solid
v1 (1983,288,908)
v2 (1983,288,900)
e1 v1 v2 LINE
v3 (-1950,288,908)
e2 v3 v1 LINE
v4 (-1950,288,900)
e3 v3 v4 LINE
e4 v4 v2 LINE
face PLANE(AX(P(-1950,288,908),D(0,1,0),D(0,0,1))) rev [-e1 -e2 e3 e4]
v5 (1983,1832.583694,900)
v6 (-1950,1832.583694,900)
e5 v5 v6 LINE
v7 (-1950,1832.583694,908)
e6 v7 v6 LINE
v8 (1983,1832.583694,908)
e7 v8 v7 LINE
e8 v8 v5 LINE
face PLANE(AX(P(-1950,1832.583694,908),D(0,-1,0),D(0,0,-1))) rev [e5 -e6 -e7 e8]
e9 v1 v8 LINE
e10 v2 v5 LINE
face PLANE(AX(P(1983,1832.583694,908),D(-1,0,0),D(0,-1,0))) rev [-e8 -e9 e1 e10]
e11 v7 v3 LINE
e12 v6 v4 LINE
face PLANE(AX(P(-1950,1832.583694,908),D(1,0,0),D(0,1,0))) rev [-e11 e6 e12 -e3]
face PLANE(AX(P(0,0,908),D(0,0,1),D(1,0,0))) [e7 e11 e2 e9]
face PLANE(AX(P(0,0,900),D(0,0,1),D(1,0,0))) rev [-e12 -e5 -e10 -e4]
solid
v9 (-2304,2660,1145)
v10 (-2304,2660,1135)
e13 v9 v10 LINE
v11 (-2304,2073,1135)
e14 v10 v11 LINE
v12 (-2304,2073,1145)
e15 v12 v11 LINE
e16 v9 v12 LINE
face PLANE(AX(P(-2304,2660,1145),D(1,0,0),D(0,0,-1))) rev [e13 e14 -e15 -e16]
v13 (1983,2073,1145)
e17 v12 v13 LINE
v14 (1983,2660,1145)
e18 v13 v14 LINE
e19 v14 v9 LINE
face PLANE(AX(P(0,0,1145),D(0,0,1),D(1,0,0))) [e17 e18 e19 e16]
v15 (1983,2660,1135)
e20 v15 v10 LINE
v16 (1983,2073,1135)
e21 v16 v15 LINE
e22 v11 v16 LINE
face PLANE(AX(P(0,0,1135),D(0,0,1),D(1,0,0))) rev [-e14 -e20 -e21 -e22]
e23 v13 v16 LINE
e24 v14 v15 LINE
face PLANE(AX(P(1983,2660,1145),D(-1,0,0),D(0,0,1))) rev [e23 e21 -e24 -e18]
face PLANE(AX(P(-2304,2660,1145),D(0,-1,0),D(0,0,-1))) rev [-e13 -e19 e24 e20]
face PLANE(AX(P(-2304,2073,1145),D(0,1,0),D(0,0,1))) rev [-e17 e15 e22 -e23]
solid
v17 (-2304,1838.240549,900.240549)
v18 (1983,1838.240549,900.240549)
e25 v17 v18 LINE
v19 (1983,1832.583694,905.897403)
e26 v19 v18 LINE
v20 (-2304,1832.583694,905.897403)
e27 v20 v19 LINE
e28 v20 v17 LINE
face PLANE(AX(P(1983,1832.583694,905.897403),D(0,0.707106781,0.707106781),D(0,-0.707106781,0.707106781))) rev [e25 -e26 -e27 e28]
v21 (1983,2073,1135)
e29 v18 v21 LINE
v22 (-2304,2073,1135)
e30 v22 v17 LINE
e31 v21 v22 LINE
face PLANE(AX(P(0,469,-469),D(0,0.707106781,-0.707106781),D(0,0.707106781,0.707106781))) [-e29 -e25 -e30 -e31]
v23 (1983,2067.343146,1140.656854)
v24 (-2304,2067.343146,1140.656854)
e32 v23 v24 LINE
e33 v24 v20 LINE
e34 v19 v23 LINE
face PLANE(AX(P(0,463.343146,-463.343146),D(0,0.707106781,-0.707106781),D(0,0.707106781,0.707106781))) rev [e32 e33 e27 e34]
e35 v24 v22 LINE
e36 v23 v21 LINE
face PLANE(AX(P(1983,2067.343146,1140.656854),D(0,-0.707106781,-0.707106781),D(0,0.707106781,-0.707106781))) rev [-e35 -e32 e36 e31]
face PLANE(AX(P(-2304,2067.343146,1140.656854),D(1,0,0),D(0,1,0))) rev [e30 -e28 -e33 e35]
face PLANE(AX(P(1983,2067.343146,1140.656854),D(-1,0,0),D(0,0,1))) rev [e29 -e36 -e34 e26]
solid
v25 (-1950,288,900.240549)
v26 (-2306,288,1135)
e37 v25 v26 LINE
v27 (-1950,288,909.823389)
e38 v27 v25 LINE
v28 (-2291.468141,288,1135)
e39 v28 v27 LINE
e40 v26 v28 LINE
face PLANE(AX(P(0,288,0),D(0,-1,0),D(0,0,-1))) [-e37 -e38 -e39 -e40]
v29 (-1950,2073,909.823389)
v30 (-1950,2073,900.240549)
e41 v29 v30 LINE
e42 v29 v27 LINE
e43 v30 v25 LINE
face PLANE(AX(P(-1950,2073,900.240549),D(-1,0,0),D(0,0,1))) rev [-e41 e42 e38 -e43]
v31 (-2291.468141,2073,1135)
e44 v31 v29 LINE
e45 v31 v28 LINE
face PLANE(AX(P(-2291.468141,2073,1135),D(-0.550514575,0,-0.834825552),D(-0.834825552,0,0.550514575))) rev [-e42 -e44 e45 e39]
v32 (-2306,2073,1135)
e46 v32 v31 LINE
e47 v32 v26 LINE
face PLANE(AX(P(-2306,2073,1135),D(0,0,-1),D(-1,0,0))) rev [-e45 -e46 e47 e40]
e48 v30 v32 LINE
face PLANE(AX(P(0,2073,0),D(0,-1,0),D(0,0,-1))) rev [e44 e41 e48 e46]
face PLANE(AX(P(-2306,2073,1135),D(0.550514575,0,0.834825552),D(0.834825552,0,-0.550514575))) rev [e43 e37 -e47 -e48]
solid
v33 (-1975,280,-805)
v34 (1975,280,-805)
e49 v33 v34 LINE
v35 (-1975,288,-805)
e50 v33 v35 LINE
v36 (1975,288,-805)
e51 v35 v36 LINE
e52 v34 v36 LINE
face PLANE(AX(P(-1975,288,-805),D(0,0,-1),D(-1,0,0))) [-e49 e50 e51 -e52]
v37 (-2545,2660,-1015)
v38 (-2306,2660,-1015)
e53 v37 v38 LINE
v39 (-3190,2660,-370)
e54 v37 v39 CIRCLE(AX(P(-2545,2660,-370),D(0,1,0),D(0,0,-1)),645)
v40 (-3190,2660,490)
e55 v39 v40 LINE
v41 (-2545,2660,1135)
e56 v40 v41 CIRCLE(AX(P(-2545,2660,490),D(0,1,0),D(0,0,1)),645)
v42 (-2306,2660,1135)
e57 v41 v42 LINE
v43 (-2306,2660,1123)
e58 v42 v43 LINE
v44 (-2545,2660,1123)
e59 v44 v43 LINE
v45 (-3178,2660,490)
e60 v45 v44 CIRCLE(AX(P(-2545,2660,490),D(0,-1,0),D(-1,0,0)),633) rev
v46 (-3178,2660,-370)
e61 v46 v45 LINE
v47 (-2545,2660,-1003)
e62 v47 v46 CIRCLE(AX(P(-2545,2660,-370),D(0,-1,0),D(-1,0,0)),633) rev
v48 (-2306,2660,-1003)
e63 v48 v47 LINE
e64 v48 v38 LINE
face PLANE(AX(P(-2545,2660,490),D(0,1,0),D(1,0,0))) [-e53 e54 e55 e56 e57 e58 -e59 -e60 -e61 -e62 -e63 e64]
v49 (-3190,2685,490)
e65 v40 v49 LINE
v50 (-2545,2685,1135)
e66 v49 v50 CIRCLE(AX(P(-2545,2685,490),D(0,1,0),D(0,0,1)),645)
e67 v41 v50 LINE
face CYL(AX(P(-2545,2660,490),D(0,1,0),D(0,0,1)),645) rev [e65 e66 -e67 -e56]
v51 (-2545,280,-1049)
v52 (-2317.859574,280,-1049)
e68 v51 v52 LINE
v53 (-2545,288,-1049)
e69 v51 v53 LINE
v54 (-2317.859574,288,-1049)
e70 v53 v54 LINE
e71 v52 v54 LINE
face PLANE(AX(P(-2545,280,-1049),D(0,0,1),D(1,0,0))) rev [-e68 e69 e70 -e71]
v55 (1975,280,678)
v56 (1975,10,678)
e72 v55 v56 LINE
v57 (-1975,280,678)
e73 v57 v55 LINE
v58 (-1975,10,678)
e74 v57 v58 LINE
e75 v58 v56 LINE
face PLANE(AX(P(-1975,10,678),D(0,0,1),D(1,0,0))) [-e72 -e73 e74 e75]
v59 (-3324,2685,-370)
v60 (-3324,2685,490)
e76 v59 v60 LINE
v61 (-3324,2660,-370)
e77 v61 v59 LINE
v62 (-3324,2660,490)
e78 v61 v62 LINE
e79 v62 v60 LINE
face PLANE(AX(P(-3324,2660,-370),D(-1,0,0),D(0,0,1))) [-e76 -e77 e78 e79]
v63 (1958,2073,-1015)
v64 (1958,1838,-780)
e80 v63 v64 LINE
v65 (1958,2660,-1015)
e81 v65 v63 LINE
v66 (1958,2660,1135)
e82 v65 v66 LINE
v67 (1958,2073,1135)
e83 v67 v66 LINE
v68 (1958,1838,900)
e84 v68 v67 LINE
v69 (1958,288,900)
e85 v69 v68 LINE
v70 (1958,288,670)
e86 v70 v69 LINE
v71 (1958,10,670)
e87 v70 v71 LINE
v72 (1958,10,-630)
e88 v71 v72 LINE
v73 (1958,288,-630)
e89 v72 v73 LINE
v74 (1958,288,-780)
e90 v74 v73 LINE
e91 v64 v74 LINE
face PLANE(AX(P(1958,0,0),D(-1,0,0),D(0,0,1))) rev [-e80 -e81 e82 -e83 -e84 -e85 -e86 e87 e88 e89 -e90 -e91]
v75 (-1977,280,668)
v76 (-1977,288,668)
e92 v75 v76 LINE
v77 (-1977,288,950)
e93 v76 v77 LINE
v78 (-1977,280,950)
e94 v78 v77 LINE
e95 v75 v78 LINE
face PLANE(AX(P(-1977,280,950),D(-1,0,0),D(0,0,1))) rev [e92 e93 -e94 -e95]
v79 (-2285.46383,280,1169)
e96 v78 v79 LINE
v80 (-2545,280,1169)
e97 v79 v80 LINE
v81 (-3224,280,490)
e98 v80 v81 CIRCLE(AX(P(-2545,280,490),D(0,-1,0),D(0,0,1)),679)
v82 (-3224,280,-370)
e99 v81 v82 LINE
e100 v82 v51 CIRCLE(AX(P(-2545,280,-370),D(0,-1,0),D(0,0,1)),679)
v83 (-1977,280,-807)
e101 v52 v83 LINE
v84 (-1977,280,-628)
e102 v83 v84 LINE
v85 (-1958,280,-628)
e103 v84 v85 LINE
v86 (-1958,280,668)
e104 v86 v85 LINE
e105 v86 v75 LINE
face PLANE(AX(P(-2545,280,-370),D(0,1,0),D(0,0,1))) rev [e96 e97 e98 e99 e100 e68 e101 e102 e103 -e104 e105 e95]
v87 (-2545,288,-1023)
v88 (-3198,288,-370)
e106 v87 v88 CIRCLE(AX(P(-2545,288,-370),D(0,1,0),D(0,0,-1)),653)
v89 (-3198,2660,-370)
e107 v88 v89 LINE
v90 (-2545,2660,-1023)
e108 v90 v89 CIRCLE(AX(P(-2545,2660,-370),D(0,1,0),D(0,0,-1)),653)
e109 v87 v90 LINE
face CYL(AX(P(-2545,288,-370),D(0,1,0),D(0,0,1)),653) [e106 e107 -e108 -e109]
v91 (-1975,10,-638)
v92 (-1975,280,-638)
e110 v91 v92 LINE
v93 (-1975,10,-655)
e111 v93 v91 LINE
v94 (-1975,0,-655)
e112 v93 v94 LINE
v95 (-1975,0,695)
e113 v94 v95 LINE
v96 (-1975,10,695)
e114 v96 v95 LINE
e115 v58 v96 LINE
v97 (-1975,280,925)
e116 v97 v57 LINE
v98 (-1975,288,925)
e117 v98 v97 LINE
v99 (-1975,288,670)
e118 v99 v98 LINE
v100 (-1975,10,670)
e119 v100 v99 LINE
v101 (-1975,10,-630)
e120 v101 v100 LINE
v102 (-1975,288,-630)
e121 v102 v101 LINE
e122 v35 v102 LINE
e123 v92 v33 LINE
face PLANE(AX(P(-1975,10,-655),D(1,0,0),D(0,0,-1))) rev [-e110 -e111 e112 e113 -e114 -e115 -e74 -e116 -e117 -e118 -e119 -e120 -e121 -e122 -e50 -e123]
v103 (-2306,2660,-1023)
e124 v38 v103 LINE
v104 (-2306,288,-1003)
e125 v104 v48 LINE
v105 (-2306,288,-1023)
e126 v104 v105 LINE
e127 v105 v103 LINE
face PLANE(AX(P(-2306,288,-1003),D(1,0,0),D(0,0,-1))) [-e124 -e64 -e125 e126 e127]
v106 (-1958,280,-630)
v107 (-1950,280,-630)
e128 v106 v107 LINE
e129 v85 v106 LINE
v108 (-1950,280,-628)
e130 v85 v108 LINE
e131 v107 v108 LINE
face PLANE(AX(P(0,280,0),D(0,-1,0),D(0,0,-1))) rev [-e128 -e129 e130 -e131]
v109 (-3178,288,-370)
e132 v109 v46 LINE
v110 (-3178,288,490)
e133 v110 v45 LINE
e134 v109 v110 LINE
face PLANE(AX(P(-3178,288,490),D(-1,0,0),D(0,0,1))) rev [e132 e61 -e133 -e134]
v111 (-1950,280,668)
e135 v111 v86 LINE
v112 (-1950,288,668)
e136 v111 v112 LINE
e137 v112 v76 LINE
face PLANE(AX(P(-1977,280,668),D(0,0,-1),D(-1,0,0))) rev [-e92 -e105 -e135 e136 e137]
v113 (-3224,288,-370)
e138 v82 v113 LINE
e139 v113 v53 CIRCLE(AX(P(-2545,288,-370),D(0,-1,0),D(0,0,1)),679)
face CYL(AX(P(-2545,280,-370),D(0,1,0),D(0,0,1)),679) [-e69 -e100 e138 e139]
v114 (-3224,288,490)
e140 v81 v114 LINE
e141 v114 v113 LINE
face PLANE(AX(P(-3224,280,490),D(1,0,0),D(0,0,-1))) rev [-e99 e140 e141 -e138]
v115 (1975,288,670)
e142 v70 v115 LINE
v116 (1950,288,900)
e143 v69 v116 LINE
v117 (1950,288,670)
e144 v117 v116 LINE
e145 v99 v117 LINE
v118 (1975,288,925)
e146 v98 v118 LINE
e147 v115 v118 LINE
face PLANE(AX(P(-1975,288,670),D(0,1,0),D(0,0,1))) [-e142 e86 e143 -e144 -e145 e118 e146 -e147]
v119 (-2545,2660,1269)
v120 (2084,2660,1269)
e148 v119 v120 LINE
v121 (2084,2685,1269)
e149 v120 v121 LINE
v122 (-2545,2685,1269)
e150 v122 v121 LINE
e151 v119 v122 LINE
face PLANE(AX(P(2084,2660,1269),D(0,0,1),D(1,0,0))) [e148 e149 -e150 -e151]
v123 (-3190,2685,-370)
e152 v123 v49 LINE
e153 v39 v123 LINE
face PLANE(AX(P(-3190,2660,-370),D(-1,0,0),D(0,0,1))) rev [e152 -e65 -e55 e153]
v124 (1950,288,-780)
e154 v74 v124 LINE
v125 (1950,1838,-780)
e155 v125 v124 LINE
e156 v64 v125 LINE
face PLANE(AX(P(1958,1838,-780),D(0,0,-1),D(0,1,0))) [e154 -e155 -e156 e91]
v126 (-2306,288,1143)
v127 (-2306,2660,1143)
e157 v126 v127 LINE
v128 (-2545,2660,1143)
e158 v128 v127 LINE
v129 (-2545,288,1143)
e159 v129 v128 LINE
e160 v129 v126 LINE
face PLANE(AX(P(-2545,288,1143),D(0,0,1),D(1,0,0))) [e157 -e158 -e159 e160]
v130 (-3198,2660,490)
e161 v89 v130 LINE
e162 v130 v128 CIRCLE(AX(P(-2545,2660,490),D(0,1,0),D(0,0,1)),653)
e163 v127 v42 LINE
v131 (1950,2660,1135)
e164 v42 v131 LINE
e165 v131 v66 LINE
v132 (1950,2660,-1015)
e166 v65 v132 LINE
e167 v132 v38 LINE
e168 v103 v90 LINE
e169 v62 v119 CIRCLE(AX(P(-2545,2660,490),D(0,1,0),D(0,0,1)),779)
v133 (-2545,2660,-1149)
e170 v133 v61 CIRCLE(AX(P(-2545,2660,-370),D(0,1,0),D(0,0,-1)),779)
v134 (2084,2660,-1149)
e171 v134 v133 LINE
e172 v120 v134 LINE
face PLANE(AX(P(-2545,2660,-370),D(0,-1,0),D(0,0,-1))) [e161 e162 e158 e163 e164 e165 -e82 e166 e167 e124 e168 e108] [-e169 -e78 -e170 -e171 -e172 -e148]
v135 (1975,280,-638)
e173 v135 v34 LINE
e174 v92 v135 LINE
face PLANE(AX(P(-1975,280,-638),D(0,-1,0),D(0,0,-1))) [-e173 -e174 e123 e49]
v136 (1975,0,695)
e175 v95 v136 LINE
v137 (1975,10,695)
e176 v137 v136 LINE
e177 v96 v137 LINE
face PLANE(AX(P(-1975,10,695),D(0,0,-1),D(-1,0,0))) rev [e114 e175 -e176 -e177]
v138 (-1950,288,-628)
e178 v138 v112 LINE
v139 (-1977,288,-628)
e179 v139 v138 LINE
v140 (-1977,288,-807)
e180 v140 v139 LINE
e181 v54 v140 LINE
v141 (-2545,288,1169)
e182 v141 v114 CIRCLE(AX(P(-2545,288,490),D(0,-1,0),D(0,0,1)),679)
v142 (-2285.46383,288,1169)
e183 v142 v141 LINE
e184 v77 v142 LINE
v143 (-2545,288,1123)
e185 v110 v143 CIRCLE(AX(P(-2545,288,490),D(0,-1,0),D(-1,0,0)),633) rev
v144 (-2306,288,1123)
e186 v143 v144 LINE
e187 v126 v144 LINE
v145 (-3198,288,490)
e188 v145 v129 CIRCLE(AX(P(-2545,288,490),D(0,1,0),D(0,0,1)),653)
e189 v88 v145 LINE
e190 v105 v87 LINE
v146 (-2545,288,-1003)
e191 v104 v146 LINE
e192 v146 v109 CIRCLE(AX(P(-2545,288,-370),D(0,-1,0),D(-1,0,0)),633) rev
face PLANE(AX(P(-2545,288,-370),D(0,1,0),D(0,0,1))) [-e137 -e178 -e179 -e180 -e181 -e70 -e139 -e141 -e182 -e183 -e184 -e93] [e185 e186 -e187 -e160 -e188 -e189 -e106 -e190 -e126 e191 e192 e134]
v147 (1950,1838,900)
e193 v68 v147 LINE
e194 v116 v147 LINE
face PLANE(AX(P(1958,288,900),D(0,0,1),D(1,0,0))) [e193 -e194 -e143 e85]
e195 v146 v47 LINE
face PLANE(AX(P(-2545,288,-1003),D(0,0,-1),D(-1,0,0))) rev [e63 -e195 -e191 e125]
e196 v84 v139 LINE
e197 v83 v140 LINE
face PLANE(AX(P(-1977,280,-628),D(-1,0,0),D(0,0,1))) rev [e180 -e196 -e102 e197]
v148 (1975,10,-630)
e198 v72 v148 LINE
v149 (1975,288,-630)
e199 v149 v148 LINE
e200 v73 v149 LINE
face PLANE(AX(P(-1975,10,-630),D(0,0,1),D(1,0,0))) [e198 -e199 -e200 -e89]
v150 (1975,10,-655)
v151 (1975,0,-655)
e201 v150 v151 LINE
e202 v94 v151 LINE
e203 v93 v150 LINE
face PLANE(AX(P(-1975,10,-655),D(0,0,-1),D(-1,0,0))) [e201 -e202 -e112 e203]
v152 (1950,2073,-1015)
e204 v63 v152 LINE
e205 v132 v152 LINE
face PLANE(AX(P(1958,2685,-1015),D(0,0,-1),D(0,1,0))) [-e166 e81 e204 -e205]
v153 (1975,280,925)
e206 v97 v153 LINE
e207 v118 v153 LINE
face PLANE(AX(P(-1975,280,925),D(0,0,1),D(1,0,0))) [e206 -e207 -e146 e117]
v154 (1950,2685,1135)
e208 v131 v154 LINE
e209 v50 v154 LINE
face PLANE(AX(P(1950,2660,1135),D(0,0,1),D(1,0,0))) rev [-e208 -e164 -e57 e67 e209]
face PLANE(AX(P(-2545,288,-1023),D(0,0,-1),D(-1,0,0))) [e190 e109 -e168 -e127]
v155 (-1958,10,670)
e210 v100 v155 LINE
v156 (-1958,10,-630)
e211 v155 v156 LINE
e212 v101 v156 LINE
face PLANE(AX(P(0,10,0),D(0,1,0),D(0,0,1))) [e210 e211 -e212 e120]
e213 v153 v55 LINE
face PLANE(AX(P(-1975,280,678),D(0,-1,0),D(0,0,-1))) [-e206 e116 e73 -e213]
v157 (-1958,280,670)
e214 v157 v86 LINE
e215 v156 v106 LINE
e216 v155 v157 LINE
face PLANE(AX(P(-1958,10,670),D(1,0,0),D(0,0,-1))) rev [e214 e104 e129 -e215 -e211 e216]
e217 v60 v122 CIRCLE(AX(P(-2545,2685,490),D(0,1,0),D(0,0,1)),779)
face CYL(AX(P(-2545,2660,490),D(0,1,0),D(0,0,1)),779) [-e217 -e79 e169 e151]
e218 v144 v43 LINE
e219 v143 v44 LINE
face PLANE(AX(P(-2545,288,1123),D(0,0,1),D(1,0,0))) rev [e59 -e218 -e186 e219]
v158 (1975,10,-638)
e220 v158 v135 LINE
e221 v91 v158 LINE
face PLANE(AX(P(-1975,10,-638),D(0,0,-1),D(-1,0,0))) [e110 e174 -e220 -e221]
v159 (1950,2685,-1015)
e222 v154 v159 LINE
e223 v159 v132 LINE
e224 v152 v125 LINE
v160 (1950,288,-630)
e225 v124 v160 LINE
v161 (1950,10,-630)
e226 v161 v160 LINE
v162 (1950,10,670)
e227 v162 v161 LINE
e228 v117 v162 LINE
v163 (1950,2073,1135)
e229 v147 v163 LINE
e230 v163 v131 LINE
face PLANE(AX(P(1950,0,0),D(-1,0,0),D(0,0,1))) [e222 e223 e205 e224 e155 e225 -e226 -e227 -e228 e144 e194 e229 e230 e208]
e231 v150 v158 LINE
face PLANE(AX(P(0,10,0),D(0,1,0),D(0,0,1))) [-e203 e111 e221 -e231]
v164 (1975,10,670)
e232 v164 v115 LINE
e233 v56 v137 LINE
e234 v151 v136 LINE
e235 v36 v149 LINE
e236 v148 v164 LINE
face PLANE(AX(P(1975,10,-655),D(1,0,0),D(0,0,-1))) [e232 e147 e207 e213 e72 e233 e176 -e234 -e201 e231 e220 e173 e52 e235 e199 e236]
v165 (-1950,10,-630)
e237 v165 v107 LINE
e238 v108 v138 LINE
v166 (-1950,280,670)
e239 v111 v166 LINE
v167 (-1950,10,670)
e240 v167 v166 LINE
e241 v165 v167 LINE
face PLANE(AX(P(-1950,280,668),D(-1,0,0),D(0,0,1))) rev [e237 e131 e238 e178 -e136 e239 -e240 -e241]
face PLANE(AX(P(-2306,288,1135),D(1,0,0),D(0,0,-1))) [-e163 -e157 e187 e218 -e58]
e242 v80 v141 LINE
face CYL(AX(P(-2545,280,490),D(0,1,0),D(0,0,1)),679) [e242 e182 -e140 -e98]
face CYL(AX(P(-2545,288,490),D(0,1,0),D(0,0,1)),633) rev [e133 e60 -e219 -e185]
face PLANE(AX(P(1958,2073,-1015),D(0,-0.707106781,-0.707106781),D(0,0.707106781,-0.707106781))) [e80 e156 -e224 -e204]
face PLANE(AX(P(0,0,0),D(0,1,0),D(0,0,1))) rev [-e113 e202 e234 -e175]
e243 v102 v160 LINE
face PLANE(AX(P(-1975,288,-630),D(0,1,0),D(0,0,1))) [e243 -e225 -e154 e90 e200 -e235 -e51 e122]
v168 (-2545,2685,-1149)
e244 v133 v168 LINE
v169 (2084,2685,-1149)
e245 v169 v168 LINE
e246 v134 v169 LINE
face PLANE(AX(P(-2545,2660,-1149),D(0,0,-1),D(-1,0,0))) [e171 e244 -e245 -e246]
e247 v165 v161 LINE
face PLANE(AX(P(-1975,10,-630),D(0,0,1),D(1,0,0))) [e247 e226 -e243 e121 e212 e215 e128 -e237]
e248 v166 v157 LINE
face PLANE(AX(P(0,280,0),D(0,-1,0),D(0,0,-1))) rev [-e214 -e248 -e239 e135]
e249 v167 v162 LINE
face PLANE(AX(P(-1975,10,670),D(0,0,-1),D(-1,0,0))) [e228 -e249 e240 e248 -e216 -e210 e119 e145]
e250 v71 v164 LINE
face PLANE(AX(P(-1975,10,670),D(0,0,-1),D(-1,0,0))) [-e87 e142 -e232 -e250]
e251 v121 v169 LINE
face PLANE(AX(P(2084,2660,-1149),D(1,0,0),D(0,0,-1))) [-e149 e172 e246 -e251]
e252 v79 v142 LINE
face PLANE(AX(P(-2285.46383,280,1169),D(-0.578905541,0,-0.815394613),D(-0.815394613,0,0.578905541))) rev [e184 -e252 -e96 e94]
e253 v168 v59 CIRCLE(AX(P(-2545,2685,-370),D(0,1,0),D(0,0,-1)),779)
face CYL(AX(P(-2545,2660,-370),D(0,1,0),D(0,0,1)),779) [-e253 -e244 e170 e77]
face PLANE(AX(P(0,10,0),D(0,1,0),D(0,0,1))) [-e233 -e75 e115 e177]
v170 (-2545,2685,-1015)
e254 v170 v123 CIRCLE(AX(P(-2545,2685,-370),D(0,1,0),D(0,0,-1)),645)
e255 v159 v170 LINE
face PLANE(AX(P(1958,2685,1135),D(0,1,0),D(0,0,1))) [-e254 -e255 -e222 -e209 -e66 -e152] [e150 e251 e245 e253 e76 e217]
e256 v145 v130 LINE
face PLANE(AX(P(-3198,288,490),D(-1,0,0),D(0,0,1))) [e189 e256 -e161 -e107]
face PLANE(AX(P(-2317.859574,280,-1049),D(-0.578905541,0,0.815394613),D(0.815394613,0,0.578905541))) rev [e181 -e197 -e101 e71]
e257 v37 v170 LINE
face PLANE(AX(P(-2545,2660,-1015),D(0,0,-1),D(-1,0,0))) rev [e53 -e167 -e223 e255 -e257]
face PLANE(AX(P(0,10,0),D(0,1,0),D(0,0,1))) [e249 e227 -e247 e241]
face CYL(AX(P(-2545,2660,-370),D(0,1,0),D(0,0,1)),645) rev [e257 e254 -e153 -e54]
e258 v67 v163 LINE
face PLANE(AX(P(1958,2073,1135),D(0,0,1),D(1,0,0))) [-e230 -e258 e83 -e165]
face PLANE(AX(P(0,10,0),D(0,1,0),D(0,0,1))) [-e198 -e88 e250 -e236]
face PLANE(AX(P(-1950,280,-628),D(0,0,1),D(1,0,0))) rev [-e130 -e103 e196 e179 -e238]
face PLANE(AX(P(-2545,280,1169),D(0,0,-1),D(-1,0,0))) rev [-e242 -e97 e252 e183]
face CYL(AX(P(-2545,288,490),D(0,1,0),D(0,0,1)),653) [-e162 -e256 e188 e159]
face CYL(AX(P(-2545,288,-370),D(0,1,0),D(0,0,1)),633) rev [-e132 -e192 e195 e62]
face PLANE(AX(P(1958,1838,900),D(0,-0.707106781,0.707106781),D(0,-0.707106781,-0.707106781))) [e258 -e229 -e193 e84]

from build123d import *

# Parameters (mm, degrees)
SKETCH2_W                = 3950
SKETCH2_H                = 1350
BOTTOM_10_MM_DEPTH       = 10
BEND_BOTTOM_8_MM_DEPTH   = 3950
BACK_8_MM_DEPTH          = 8
CURB_25_DEPTH            = 25
FRONT_ROUND_DEPTH        = 2372
BEND_BOTTOM_8_MM_2_DEPTH = 8
SKETCH8_W                = 8
SKETCH8_H                = 1300
BOTTOM_LOWER_DEPTH       = 270
SKETCH9_W                = 4287
SKETCH9_H                = 587
HV_UPPER_DEPTH           = 10
SKETCH10_W               = 4287
SKETCH10_H               = 332
HV_MID_DEPTH             = 8
SKETCH11_W               = 3933
SKETCH11_H               = 1544.583694397
HV_LOWER_DEPTH           = 8
TEDA_WALA_HV_LV_DEPTH    = 1785


with BuildPart() as part:
    # Sketch2 → bottom 10 mm (new body)
    with BuildSketch(Plane(origin=(0, 0, 0), x_dir=(1, 0, 0), z_dir=(0, 1, 0))):
        with Locations((0, -20)):
            Rectangle(SKETCH2_W, SKETCH2_H)
    extrude(amount=BOTTOM_10_MM_DEPTH)

    # Sketch3 → bend bottom 8 mm (add)
    with BuildSketch(Plane(origin=(1975, 0, 0), x_dir=(0, 0, -1), z_dir=(1, 0, 0))):
        Polygon((-670, 10), (-670, 288), (-925, 288), (-925, 280), (-678, 280), (-678, 10), align=None)
        Polygon((630, 10), (630, 288), (805, 288), (805, 280), (638, 280), (638, 10), align=None)
    extrude(amount=-BEND_BOTTOM_8_MM_DEPTH)

    # Sketch4 → back 8 mm (add)
    with BuildSketch(Plane(origin=(1950, 0, 0), x_dir=(0, 0, -1), z_dir=(1, 0, 0))):
        Polygon((-1135, 2685), (1015, 2685), (1015, 2073), (780, 1838), (780, 288), (630, 288), (630, 10), (-670, 10), (-670, 288), (-900, 288), (-900, 1838), (-1135, 2073), align=None)
    extrude(amount=BACK_8_MM_DEPTH)

    # Sketch5 → CURB 25 (add)
    with BuildSketch(Plane(origin=(0, 2685, 0), x_dir=(1, 0, 0), z_dir=(0, 1, 0))):
        with BuildLine():
            Line((-2545, 1149), (2084, 1149))
            Line((2084, 1149), (2084, -1269))
            Line((2084, -1269), (-2545, -1269))
            ThreePointArc((-2545, -1269), (-3095.836182544, -1040.836182544), (-3324, -490))
            Line((-3324, -490), (-3324, 370))
            ThreePointArc((-3324, 370), (-3095.836182544, 920.836182544), (-2545, 1149))
        make_face()
        with BuildLine():
            Line((-2545, 1015), (1950, 1015))
            Line((1950, 1015), (1950, -1135))
            Line((1950, -1135), (-2545, -1135))
            ThreePointArc((-2545, -1135), (-3001.083873865, -946.083873865), (-3190, -490))
            Line((-3190, -490), (-3190, 370))
            ThreePointArc((-3190, 370), (-3001.083873865, 826.083873865), (-2545, 1015))
        make_face(mode=Mode.SUBTRACT)
    extrude(amount=-CURB_25_DEPTH)

    # Sketch6 → front round (add)
    with BuildSketch(Plane(origin=(0, 2660, 0), x_dir=(-1, 0, 0), z_dir=(0, -1, 0))):
        with BuildLine():
            Line((2306, 1015), (2545, 1015))
            ThreePointArc((2545, 1015), (3001.083873865, 826.083873865), (3190, 370))
            Line((3190, 370), (3190, -490))
            ThreePointArc((3190, -490), (3001.083873865, -946.083873865), (2545, -1135))
            Line((2545, -1135), (2306, -1135))
            Line((2306, -1135), (2306, -1123))
            Line((2306, -1123), (2545, -1123))
            ThreePointArc((2545, -1123), (2992.598592491, -937.598592491), (3178, -490))
            Line((3178, -490), (3178, 370))
            ThreePointArc((3178, 370), (2992.598592491, 817.598592491), (2545, 1003))
            Line((2545, 1003), (2306, 1003))
            Line((2306, 1003), (2306, 1015))
        make_face()
        with BuildLine():
            Line((2306, -1143), (2545, -1143))
            ThreePointArc((2545, -1143), (3006.740728115, -951.740728115), (3198, -490))
            Line((3198, -490), (3198, 370))
            ThreePointArc((3198, 370), (3006.740728115, 831.740728115), (2545, 1023))
            Line((2545, 1023), (2306, 1023))
            Line((2306, 1023), (2306, 1011))
            Line((2306, 1011), (2545, 1011))
            ThreePointArc((2545, 1011), (2998.255446741, 823.255446741), (3186, 370))
            Line((3186, 370), (3186, -490))
            ThreePointArc((3186, -490), (2998.255446741, -943.255446741), (2545, -1131))
            Line((2545, -1131), (2306, -1131))
            Line((2306, -1131), (2306, -1143))
        make_face()
    extrude(amount=FRONT_ROUND_DEPTH)

    # Sketch7 → bend bottom 8 mm 2 (add)
    with BuildSketch(Plane.XZ.offset(-288)):
        with BuildLine():
            Line((-2545, -1049), (-2317.859574468, -1049))
            Line((-2317.859574468, -1049), (-1977, -807))
            Line((-1977, -807), (-1977, -628))
            Line((-1977, -628), (-1950, -628))
            Line((-1950, -628), (-1950, 668))
            Line((-1950, 668), (-1977, 668))
            Line((-1977, 668), (-1977, 950))
            Line((-1977, 950), (-2285.463829787, 1169))
            Line((-2285.463829787, 1169), (-2545, 1169))
            ThreePointArc((-2545, 1169), (-3025.125504426, 970.125504426), (-3224, 490))
            Line((-3224, 490), (-3224, -370))
            ThreePointArc((-3224, -370), (-3025.125504426, -850.125504426), (-2545, -1049))
        make_face()
    extrude(amount=BEND_BOTTOM_8_MM_2_DEPTH)

    # Sketch8 → bottom lower (add)
    with BuildSketch(Plane.XZ.offset(-280)):
        with Locations((-1954, 20)):
            Rectangle(SKETCH8_W, SKETCH8_H)
    extrude(amount=BOTTOM_LOWER_DEPTH)


with BuildPart() as body_2:
    # Sketch9 → hv upper (new body)
    with BuildSketch(Plane.XY.offset(1135)):
        with Locations((-160.5, 2366.5)):
            Rectangle(SKETCH9_W, SKETCH9_H)
    extrude(amount=HV_UPPER_DEPTH)


with BuildPart() as body_3:
    # Sketch10 → hv mid (new body)
    with BuildSketch(Plane(origin=(0, 469, -469), x_dir=(1, 0, 0), z_dir=(0, -0.7071067811865479, 0.7071067811865472))):
        with Locations((-160.5, 2102.398554046)):
            Rectangle(SKETCH10_W, SKETCH10_H)
    extrude(amount=HV_MID_DEPTH)


with BuildPart() as body_4:
    # Sketch11 → HV lower (new body)
    with BuildSketch(Plane.XY.offset(900)):
        with Locations((16.5, 1060.291847198)):
            Rectangle(SKETCH11_W, SKETCH11_H)
    extrude(amount=HV_LOWER_DEPTH)


with BuildPart() as body_5:
    # Sketch12 → teda wala hv lv (new body)
    with BuildSketch(Plane(origin=(0, 288, 0), x_dir=(1, 0, 0), z_dir=(0, 1, 0))):
        Polygon((-2306, -1135), (-1950, -900.240548646), (-1950, -909.82338901), (-2291.468141326, -1135), align=None)
    extrude(amount=TEDA_WALA_HV_LV_DEPTH)


solid = Compound([part.part, body_2.part, body_3.part, body_4.part, body_5.part])
